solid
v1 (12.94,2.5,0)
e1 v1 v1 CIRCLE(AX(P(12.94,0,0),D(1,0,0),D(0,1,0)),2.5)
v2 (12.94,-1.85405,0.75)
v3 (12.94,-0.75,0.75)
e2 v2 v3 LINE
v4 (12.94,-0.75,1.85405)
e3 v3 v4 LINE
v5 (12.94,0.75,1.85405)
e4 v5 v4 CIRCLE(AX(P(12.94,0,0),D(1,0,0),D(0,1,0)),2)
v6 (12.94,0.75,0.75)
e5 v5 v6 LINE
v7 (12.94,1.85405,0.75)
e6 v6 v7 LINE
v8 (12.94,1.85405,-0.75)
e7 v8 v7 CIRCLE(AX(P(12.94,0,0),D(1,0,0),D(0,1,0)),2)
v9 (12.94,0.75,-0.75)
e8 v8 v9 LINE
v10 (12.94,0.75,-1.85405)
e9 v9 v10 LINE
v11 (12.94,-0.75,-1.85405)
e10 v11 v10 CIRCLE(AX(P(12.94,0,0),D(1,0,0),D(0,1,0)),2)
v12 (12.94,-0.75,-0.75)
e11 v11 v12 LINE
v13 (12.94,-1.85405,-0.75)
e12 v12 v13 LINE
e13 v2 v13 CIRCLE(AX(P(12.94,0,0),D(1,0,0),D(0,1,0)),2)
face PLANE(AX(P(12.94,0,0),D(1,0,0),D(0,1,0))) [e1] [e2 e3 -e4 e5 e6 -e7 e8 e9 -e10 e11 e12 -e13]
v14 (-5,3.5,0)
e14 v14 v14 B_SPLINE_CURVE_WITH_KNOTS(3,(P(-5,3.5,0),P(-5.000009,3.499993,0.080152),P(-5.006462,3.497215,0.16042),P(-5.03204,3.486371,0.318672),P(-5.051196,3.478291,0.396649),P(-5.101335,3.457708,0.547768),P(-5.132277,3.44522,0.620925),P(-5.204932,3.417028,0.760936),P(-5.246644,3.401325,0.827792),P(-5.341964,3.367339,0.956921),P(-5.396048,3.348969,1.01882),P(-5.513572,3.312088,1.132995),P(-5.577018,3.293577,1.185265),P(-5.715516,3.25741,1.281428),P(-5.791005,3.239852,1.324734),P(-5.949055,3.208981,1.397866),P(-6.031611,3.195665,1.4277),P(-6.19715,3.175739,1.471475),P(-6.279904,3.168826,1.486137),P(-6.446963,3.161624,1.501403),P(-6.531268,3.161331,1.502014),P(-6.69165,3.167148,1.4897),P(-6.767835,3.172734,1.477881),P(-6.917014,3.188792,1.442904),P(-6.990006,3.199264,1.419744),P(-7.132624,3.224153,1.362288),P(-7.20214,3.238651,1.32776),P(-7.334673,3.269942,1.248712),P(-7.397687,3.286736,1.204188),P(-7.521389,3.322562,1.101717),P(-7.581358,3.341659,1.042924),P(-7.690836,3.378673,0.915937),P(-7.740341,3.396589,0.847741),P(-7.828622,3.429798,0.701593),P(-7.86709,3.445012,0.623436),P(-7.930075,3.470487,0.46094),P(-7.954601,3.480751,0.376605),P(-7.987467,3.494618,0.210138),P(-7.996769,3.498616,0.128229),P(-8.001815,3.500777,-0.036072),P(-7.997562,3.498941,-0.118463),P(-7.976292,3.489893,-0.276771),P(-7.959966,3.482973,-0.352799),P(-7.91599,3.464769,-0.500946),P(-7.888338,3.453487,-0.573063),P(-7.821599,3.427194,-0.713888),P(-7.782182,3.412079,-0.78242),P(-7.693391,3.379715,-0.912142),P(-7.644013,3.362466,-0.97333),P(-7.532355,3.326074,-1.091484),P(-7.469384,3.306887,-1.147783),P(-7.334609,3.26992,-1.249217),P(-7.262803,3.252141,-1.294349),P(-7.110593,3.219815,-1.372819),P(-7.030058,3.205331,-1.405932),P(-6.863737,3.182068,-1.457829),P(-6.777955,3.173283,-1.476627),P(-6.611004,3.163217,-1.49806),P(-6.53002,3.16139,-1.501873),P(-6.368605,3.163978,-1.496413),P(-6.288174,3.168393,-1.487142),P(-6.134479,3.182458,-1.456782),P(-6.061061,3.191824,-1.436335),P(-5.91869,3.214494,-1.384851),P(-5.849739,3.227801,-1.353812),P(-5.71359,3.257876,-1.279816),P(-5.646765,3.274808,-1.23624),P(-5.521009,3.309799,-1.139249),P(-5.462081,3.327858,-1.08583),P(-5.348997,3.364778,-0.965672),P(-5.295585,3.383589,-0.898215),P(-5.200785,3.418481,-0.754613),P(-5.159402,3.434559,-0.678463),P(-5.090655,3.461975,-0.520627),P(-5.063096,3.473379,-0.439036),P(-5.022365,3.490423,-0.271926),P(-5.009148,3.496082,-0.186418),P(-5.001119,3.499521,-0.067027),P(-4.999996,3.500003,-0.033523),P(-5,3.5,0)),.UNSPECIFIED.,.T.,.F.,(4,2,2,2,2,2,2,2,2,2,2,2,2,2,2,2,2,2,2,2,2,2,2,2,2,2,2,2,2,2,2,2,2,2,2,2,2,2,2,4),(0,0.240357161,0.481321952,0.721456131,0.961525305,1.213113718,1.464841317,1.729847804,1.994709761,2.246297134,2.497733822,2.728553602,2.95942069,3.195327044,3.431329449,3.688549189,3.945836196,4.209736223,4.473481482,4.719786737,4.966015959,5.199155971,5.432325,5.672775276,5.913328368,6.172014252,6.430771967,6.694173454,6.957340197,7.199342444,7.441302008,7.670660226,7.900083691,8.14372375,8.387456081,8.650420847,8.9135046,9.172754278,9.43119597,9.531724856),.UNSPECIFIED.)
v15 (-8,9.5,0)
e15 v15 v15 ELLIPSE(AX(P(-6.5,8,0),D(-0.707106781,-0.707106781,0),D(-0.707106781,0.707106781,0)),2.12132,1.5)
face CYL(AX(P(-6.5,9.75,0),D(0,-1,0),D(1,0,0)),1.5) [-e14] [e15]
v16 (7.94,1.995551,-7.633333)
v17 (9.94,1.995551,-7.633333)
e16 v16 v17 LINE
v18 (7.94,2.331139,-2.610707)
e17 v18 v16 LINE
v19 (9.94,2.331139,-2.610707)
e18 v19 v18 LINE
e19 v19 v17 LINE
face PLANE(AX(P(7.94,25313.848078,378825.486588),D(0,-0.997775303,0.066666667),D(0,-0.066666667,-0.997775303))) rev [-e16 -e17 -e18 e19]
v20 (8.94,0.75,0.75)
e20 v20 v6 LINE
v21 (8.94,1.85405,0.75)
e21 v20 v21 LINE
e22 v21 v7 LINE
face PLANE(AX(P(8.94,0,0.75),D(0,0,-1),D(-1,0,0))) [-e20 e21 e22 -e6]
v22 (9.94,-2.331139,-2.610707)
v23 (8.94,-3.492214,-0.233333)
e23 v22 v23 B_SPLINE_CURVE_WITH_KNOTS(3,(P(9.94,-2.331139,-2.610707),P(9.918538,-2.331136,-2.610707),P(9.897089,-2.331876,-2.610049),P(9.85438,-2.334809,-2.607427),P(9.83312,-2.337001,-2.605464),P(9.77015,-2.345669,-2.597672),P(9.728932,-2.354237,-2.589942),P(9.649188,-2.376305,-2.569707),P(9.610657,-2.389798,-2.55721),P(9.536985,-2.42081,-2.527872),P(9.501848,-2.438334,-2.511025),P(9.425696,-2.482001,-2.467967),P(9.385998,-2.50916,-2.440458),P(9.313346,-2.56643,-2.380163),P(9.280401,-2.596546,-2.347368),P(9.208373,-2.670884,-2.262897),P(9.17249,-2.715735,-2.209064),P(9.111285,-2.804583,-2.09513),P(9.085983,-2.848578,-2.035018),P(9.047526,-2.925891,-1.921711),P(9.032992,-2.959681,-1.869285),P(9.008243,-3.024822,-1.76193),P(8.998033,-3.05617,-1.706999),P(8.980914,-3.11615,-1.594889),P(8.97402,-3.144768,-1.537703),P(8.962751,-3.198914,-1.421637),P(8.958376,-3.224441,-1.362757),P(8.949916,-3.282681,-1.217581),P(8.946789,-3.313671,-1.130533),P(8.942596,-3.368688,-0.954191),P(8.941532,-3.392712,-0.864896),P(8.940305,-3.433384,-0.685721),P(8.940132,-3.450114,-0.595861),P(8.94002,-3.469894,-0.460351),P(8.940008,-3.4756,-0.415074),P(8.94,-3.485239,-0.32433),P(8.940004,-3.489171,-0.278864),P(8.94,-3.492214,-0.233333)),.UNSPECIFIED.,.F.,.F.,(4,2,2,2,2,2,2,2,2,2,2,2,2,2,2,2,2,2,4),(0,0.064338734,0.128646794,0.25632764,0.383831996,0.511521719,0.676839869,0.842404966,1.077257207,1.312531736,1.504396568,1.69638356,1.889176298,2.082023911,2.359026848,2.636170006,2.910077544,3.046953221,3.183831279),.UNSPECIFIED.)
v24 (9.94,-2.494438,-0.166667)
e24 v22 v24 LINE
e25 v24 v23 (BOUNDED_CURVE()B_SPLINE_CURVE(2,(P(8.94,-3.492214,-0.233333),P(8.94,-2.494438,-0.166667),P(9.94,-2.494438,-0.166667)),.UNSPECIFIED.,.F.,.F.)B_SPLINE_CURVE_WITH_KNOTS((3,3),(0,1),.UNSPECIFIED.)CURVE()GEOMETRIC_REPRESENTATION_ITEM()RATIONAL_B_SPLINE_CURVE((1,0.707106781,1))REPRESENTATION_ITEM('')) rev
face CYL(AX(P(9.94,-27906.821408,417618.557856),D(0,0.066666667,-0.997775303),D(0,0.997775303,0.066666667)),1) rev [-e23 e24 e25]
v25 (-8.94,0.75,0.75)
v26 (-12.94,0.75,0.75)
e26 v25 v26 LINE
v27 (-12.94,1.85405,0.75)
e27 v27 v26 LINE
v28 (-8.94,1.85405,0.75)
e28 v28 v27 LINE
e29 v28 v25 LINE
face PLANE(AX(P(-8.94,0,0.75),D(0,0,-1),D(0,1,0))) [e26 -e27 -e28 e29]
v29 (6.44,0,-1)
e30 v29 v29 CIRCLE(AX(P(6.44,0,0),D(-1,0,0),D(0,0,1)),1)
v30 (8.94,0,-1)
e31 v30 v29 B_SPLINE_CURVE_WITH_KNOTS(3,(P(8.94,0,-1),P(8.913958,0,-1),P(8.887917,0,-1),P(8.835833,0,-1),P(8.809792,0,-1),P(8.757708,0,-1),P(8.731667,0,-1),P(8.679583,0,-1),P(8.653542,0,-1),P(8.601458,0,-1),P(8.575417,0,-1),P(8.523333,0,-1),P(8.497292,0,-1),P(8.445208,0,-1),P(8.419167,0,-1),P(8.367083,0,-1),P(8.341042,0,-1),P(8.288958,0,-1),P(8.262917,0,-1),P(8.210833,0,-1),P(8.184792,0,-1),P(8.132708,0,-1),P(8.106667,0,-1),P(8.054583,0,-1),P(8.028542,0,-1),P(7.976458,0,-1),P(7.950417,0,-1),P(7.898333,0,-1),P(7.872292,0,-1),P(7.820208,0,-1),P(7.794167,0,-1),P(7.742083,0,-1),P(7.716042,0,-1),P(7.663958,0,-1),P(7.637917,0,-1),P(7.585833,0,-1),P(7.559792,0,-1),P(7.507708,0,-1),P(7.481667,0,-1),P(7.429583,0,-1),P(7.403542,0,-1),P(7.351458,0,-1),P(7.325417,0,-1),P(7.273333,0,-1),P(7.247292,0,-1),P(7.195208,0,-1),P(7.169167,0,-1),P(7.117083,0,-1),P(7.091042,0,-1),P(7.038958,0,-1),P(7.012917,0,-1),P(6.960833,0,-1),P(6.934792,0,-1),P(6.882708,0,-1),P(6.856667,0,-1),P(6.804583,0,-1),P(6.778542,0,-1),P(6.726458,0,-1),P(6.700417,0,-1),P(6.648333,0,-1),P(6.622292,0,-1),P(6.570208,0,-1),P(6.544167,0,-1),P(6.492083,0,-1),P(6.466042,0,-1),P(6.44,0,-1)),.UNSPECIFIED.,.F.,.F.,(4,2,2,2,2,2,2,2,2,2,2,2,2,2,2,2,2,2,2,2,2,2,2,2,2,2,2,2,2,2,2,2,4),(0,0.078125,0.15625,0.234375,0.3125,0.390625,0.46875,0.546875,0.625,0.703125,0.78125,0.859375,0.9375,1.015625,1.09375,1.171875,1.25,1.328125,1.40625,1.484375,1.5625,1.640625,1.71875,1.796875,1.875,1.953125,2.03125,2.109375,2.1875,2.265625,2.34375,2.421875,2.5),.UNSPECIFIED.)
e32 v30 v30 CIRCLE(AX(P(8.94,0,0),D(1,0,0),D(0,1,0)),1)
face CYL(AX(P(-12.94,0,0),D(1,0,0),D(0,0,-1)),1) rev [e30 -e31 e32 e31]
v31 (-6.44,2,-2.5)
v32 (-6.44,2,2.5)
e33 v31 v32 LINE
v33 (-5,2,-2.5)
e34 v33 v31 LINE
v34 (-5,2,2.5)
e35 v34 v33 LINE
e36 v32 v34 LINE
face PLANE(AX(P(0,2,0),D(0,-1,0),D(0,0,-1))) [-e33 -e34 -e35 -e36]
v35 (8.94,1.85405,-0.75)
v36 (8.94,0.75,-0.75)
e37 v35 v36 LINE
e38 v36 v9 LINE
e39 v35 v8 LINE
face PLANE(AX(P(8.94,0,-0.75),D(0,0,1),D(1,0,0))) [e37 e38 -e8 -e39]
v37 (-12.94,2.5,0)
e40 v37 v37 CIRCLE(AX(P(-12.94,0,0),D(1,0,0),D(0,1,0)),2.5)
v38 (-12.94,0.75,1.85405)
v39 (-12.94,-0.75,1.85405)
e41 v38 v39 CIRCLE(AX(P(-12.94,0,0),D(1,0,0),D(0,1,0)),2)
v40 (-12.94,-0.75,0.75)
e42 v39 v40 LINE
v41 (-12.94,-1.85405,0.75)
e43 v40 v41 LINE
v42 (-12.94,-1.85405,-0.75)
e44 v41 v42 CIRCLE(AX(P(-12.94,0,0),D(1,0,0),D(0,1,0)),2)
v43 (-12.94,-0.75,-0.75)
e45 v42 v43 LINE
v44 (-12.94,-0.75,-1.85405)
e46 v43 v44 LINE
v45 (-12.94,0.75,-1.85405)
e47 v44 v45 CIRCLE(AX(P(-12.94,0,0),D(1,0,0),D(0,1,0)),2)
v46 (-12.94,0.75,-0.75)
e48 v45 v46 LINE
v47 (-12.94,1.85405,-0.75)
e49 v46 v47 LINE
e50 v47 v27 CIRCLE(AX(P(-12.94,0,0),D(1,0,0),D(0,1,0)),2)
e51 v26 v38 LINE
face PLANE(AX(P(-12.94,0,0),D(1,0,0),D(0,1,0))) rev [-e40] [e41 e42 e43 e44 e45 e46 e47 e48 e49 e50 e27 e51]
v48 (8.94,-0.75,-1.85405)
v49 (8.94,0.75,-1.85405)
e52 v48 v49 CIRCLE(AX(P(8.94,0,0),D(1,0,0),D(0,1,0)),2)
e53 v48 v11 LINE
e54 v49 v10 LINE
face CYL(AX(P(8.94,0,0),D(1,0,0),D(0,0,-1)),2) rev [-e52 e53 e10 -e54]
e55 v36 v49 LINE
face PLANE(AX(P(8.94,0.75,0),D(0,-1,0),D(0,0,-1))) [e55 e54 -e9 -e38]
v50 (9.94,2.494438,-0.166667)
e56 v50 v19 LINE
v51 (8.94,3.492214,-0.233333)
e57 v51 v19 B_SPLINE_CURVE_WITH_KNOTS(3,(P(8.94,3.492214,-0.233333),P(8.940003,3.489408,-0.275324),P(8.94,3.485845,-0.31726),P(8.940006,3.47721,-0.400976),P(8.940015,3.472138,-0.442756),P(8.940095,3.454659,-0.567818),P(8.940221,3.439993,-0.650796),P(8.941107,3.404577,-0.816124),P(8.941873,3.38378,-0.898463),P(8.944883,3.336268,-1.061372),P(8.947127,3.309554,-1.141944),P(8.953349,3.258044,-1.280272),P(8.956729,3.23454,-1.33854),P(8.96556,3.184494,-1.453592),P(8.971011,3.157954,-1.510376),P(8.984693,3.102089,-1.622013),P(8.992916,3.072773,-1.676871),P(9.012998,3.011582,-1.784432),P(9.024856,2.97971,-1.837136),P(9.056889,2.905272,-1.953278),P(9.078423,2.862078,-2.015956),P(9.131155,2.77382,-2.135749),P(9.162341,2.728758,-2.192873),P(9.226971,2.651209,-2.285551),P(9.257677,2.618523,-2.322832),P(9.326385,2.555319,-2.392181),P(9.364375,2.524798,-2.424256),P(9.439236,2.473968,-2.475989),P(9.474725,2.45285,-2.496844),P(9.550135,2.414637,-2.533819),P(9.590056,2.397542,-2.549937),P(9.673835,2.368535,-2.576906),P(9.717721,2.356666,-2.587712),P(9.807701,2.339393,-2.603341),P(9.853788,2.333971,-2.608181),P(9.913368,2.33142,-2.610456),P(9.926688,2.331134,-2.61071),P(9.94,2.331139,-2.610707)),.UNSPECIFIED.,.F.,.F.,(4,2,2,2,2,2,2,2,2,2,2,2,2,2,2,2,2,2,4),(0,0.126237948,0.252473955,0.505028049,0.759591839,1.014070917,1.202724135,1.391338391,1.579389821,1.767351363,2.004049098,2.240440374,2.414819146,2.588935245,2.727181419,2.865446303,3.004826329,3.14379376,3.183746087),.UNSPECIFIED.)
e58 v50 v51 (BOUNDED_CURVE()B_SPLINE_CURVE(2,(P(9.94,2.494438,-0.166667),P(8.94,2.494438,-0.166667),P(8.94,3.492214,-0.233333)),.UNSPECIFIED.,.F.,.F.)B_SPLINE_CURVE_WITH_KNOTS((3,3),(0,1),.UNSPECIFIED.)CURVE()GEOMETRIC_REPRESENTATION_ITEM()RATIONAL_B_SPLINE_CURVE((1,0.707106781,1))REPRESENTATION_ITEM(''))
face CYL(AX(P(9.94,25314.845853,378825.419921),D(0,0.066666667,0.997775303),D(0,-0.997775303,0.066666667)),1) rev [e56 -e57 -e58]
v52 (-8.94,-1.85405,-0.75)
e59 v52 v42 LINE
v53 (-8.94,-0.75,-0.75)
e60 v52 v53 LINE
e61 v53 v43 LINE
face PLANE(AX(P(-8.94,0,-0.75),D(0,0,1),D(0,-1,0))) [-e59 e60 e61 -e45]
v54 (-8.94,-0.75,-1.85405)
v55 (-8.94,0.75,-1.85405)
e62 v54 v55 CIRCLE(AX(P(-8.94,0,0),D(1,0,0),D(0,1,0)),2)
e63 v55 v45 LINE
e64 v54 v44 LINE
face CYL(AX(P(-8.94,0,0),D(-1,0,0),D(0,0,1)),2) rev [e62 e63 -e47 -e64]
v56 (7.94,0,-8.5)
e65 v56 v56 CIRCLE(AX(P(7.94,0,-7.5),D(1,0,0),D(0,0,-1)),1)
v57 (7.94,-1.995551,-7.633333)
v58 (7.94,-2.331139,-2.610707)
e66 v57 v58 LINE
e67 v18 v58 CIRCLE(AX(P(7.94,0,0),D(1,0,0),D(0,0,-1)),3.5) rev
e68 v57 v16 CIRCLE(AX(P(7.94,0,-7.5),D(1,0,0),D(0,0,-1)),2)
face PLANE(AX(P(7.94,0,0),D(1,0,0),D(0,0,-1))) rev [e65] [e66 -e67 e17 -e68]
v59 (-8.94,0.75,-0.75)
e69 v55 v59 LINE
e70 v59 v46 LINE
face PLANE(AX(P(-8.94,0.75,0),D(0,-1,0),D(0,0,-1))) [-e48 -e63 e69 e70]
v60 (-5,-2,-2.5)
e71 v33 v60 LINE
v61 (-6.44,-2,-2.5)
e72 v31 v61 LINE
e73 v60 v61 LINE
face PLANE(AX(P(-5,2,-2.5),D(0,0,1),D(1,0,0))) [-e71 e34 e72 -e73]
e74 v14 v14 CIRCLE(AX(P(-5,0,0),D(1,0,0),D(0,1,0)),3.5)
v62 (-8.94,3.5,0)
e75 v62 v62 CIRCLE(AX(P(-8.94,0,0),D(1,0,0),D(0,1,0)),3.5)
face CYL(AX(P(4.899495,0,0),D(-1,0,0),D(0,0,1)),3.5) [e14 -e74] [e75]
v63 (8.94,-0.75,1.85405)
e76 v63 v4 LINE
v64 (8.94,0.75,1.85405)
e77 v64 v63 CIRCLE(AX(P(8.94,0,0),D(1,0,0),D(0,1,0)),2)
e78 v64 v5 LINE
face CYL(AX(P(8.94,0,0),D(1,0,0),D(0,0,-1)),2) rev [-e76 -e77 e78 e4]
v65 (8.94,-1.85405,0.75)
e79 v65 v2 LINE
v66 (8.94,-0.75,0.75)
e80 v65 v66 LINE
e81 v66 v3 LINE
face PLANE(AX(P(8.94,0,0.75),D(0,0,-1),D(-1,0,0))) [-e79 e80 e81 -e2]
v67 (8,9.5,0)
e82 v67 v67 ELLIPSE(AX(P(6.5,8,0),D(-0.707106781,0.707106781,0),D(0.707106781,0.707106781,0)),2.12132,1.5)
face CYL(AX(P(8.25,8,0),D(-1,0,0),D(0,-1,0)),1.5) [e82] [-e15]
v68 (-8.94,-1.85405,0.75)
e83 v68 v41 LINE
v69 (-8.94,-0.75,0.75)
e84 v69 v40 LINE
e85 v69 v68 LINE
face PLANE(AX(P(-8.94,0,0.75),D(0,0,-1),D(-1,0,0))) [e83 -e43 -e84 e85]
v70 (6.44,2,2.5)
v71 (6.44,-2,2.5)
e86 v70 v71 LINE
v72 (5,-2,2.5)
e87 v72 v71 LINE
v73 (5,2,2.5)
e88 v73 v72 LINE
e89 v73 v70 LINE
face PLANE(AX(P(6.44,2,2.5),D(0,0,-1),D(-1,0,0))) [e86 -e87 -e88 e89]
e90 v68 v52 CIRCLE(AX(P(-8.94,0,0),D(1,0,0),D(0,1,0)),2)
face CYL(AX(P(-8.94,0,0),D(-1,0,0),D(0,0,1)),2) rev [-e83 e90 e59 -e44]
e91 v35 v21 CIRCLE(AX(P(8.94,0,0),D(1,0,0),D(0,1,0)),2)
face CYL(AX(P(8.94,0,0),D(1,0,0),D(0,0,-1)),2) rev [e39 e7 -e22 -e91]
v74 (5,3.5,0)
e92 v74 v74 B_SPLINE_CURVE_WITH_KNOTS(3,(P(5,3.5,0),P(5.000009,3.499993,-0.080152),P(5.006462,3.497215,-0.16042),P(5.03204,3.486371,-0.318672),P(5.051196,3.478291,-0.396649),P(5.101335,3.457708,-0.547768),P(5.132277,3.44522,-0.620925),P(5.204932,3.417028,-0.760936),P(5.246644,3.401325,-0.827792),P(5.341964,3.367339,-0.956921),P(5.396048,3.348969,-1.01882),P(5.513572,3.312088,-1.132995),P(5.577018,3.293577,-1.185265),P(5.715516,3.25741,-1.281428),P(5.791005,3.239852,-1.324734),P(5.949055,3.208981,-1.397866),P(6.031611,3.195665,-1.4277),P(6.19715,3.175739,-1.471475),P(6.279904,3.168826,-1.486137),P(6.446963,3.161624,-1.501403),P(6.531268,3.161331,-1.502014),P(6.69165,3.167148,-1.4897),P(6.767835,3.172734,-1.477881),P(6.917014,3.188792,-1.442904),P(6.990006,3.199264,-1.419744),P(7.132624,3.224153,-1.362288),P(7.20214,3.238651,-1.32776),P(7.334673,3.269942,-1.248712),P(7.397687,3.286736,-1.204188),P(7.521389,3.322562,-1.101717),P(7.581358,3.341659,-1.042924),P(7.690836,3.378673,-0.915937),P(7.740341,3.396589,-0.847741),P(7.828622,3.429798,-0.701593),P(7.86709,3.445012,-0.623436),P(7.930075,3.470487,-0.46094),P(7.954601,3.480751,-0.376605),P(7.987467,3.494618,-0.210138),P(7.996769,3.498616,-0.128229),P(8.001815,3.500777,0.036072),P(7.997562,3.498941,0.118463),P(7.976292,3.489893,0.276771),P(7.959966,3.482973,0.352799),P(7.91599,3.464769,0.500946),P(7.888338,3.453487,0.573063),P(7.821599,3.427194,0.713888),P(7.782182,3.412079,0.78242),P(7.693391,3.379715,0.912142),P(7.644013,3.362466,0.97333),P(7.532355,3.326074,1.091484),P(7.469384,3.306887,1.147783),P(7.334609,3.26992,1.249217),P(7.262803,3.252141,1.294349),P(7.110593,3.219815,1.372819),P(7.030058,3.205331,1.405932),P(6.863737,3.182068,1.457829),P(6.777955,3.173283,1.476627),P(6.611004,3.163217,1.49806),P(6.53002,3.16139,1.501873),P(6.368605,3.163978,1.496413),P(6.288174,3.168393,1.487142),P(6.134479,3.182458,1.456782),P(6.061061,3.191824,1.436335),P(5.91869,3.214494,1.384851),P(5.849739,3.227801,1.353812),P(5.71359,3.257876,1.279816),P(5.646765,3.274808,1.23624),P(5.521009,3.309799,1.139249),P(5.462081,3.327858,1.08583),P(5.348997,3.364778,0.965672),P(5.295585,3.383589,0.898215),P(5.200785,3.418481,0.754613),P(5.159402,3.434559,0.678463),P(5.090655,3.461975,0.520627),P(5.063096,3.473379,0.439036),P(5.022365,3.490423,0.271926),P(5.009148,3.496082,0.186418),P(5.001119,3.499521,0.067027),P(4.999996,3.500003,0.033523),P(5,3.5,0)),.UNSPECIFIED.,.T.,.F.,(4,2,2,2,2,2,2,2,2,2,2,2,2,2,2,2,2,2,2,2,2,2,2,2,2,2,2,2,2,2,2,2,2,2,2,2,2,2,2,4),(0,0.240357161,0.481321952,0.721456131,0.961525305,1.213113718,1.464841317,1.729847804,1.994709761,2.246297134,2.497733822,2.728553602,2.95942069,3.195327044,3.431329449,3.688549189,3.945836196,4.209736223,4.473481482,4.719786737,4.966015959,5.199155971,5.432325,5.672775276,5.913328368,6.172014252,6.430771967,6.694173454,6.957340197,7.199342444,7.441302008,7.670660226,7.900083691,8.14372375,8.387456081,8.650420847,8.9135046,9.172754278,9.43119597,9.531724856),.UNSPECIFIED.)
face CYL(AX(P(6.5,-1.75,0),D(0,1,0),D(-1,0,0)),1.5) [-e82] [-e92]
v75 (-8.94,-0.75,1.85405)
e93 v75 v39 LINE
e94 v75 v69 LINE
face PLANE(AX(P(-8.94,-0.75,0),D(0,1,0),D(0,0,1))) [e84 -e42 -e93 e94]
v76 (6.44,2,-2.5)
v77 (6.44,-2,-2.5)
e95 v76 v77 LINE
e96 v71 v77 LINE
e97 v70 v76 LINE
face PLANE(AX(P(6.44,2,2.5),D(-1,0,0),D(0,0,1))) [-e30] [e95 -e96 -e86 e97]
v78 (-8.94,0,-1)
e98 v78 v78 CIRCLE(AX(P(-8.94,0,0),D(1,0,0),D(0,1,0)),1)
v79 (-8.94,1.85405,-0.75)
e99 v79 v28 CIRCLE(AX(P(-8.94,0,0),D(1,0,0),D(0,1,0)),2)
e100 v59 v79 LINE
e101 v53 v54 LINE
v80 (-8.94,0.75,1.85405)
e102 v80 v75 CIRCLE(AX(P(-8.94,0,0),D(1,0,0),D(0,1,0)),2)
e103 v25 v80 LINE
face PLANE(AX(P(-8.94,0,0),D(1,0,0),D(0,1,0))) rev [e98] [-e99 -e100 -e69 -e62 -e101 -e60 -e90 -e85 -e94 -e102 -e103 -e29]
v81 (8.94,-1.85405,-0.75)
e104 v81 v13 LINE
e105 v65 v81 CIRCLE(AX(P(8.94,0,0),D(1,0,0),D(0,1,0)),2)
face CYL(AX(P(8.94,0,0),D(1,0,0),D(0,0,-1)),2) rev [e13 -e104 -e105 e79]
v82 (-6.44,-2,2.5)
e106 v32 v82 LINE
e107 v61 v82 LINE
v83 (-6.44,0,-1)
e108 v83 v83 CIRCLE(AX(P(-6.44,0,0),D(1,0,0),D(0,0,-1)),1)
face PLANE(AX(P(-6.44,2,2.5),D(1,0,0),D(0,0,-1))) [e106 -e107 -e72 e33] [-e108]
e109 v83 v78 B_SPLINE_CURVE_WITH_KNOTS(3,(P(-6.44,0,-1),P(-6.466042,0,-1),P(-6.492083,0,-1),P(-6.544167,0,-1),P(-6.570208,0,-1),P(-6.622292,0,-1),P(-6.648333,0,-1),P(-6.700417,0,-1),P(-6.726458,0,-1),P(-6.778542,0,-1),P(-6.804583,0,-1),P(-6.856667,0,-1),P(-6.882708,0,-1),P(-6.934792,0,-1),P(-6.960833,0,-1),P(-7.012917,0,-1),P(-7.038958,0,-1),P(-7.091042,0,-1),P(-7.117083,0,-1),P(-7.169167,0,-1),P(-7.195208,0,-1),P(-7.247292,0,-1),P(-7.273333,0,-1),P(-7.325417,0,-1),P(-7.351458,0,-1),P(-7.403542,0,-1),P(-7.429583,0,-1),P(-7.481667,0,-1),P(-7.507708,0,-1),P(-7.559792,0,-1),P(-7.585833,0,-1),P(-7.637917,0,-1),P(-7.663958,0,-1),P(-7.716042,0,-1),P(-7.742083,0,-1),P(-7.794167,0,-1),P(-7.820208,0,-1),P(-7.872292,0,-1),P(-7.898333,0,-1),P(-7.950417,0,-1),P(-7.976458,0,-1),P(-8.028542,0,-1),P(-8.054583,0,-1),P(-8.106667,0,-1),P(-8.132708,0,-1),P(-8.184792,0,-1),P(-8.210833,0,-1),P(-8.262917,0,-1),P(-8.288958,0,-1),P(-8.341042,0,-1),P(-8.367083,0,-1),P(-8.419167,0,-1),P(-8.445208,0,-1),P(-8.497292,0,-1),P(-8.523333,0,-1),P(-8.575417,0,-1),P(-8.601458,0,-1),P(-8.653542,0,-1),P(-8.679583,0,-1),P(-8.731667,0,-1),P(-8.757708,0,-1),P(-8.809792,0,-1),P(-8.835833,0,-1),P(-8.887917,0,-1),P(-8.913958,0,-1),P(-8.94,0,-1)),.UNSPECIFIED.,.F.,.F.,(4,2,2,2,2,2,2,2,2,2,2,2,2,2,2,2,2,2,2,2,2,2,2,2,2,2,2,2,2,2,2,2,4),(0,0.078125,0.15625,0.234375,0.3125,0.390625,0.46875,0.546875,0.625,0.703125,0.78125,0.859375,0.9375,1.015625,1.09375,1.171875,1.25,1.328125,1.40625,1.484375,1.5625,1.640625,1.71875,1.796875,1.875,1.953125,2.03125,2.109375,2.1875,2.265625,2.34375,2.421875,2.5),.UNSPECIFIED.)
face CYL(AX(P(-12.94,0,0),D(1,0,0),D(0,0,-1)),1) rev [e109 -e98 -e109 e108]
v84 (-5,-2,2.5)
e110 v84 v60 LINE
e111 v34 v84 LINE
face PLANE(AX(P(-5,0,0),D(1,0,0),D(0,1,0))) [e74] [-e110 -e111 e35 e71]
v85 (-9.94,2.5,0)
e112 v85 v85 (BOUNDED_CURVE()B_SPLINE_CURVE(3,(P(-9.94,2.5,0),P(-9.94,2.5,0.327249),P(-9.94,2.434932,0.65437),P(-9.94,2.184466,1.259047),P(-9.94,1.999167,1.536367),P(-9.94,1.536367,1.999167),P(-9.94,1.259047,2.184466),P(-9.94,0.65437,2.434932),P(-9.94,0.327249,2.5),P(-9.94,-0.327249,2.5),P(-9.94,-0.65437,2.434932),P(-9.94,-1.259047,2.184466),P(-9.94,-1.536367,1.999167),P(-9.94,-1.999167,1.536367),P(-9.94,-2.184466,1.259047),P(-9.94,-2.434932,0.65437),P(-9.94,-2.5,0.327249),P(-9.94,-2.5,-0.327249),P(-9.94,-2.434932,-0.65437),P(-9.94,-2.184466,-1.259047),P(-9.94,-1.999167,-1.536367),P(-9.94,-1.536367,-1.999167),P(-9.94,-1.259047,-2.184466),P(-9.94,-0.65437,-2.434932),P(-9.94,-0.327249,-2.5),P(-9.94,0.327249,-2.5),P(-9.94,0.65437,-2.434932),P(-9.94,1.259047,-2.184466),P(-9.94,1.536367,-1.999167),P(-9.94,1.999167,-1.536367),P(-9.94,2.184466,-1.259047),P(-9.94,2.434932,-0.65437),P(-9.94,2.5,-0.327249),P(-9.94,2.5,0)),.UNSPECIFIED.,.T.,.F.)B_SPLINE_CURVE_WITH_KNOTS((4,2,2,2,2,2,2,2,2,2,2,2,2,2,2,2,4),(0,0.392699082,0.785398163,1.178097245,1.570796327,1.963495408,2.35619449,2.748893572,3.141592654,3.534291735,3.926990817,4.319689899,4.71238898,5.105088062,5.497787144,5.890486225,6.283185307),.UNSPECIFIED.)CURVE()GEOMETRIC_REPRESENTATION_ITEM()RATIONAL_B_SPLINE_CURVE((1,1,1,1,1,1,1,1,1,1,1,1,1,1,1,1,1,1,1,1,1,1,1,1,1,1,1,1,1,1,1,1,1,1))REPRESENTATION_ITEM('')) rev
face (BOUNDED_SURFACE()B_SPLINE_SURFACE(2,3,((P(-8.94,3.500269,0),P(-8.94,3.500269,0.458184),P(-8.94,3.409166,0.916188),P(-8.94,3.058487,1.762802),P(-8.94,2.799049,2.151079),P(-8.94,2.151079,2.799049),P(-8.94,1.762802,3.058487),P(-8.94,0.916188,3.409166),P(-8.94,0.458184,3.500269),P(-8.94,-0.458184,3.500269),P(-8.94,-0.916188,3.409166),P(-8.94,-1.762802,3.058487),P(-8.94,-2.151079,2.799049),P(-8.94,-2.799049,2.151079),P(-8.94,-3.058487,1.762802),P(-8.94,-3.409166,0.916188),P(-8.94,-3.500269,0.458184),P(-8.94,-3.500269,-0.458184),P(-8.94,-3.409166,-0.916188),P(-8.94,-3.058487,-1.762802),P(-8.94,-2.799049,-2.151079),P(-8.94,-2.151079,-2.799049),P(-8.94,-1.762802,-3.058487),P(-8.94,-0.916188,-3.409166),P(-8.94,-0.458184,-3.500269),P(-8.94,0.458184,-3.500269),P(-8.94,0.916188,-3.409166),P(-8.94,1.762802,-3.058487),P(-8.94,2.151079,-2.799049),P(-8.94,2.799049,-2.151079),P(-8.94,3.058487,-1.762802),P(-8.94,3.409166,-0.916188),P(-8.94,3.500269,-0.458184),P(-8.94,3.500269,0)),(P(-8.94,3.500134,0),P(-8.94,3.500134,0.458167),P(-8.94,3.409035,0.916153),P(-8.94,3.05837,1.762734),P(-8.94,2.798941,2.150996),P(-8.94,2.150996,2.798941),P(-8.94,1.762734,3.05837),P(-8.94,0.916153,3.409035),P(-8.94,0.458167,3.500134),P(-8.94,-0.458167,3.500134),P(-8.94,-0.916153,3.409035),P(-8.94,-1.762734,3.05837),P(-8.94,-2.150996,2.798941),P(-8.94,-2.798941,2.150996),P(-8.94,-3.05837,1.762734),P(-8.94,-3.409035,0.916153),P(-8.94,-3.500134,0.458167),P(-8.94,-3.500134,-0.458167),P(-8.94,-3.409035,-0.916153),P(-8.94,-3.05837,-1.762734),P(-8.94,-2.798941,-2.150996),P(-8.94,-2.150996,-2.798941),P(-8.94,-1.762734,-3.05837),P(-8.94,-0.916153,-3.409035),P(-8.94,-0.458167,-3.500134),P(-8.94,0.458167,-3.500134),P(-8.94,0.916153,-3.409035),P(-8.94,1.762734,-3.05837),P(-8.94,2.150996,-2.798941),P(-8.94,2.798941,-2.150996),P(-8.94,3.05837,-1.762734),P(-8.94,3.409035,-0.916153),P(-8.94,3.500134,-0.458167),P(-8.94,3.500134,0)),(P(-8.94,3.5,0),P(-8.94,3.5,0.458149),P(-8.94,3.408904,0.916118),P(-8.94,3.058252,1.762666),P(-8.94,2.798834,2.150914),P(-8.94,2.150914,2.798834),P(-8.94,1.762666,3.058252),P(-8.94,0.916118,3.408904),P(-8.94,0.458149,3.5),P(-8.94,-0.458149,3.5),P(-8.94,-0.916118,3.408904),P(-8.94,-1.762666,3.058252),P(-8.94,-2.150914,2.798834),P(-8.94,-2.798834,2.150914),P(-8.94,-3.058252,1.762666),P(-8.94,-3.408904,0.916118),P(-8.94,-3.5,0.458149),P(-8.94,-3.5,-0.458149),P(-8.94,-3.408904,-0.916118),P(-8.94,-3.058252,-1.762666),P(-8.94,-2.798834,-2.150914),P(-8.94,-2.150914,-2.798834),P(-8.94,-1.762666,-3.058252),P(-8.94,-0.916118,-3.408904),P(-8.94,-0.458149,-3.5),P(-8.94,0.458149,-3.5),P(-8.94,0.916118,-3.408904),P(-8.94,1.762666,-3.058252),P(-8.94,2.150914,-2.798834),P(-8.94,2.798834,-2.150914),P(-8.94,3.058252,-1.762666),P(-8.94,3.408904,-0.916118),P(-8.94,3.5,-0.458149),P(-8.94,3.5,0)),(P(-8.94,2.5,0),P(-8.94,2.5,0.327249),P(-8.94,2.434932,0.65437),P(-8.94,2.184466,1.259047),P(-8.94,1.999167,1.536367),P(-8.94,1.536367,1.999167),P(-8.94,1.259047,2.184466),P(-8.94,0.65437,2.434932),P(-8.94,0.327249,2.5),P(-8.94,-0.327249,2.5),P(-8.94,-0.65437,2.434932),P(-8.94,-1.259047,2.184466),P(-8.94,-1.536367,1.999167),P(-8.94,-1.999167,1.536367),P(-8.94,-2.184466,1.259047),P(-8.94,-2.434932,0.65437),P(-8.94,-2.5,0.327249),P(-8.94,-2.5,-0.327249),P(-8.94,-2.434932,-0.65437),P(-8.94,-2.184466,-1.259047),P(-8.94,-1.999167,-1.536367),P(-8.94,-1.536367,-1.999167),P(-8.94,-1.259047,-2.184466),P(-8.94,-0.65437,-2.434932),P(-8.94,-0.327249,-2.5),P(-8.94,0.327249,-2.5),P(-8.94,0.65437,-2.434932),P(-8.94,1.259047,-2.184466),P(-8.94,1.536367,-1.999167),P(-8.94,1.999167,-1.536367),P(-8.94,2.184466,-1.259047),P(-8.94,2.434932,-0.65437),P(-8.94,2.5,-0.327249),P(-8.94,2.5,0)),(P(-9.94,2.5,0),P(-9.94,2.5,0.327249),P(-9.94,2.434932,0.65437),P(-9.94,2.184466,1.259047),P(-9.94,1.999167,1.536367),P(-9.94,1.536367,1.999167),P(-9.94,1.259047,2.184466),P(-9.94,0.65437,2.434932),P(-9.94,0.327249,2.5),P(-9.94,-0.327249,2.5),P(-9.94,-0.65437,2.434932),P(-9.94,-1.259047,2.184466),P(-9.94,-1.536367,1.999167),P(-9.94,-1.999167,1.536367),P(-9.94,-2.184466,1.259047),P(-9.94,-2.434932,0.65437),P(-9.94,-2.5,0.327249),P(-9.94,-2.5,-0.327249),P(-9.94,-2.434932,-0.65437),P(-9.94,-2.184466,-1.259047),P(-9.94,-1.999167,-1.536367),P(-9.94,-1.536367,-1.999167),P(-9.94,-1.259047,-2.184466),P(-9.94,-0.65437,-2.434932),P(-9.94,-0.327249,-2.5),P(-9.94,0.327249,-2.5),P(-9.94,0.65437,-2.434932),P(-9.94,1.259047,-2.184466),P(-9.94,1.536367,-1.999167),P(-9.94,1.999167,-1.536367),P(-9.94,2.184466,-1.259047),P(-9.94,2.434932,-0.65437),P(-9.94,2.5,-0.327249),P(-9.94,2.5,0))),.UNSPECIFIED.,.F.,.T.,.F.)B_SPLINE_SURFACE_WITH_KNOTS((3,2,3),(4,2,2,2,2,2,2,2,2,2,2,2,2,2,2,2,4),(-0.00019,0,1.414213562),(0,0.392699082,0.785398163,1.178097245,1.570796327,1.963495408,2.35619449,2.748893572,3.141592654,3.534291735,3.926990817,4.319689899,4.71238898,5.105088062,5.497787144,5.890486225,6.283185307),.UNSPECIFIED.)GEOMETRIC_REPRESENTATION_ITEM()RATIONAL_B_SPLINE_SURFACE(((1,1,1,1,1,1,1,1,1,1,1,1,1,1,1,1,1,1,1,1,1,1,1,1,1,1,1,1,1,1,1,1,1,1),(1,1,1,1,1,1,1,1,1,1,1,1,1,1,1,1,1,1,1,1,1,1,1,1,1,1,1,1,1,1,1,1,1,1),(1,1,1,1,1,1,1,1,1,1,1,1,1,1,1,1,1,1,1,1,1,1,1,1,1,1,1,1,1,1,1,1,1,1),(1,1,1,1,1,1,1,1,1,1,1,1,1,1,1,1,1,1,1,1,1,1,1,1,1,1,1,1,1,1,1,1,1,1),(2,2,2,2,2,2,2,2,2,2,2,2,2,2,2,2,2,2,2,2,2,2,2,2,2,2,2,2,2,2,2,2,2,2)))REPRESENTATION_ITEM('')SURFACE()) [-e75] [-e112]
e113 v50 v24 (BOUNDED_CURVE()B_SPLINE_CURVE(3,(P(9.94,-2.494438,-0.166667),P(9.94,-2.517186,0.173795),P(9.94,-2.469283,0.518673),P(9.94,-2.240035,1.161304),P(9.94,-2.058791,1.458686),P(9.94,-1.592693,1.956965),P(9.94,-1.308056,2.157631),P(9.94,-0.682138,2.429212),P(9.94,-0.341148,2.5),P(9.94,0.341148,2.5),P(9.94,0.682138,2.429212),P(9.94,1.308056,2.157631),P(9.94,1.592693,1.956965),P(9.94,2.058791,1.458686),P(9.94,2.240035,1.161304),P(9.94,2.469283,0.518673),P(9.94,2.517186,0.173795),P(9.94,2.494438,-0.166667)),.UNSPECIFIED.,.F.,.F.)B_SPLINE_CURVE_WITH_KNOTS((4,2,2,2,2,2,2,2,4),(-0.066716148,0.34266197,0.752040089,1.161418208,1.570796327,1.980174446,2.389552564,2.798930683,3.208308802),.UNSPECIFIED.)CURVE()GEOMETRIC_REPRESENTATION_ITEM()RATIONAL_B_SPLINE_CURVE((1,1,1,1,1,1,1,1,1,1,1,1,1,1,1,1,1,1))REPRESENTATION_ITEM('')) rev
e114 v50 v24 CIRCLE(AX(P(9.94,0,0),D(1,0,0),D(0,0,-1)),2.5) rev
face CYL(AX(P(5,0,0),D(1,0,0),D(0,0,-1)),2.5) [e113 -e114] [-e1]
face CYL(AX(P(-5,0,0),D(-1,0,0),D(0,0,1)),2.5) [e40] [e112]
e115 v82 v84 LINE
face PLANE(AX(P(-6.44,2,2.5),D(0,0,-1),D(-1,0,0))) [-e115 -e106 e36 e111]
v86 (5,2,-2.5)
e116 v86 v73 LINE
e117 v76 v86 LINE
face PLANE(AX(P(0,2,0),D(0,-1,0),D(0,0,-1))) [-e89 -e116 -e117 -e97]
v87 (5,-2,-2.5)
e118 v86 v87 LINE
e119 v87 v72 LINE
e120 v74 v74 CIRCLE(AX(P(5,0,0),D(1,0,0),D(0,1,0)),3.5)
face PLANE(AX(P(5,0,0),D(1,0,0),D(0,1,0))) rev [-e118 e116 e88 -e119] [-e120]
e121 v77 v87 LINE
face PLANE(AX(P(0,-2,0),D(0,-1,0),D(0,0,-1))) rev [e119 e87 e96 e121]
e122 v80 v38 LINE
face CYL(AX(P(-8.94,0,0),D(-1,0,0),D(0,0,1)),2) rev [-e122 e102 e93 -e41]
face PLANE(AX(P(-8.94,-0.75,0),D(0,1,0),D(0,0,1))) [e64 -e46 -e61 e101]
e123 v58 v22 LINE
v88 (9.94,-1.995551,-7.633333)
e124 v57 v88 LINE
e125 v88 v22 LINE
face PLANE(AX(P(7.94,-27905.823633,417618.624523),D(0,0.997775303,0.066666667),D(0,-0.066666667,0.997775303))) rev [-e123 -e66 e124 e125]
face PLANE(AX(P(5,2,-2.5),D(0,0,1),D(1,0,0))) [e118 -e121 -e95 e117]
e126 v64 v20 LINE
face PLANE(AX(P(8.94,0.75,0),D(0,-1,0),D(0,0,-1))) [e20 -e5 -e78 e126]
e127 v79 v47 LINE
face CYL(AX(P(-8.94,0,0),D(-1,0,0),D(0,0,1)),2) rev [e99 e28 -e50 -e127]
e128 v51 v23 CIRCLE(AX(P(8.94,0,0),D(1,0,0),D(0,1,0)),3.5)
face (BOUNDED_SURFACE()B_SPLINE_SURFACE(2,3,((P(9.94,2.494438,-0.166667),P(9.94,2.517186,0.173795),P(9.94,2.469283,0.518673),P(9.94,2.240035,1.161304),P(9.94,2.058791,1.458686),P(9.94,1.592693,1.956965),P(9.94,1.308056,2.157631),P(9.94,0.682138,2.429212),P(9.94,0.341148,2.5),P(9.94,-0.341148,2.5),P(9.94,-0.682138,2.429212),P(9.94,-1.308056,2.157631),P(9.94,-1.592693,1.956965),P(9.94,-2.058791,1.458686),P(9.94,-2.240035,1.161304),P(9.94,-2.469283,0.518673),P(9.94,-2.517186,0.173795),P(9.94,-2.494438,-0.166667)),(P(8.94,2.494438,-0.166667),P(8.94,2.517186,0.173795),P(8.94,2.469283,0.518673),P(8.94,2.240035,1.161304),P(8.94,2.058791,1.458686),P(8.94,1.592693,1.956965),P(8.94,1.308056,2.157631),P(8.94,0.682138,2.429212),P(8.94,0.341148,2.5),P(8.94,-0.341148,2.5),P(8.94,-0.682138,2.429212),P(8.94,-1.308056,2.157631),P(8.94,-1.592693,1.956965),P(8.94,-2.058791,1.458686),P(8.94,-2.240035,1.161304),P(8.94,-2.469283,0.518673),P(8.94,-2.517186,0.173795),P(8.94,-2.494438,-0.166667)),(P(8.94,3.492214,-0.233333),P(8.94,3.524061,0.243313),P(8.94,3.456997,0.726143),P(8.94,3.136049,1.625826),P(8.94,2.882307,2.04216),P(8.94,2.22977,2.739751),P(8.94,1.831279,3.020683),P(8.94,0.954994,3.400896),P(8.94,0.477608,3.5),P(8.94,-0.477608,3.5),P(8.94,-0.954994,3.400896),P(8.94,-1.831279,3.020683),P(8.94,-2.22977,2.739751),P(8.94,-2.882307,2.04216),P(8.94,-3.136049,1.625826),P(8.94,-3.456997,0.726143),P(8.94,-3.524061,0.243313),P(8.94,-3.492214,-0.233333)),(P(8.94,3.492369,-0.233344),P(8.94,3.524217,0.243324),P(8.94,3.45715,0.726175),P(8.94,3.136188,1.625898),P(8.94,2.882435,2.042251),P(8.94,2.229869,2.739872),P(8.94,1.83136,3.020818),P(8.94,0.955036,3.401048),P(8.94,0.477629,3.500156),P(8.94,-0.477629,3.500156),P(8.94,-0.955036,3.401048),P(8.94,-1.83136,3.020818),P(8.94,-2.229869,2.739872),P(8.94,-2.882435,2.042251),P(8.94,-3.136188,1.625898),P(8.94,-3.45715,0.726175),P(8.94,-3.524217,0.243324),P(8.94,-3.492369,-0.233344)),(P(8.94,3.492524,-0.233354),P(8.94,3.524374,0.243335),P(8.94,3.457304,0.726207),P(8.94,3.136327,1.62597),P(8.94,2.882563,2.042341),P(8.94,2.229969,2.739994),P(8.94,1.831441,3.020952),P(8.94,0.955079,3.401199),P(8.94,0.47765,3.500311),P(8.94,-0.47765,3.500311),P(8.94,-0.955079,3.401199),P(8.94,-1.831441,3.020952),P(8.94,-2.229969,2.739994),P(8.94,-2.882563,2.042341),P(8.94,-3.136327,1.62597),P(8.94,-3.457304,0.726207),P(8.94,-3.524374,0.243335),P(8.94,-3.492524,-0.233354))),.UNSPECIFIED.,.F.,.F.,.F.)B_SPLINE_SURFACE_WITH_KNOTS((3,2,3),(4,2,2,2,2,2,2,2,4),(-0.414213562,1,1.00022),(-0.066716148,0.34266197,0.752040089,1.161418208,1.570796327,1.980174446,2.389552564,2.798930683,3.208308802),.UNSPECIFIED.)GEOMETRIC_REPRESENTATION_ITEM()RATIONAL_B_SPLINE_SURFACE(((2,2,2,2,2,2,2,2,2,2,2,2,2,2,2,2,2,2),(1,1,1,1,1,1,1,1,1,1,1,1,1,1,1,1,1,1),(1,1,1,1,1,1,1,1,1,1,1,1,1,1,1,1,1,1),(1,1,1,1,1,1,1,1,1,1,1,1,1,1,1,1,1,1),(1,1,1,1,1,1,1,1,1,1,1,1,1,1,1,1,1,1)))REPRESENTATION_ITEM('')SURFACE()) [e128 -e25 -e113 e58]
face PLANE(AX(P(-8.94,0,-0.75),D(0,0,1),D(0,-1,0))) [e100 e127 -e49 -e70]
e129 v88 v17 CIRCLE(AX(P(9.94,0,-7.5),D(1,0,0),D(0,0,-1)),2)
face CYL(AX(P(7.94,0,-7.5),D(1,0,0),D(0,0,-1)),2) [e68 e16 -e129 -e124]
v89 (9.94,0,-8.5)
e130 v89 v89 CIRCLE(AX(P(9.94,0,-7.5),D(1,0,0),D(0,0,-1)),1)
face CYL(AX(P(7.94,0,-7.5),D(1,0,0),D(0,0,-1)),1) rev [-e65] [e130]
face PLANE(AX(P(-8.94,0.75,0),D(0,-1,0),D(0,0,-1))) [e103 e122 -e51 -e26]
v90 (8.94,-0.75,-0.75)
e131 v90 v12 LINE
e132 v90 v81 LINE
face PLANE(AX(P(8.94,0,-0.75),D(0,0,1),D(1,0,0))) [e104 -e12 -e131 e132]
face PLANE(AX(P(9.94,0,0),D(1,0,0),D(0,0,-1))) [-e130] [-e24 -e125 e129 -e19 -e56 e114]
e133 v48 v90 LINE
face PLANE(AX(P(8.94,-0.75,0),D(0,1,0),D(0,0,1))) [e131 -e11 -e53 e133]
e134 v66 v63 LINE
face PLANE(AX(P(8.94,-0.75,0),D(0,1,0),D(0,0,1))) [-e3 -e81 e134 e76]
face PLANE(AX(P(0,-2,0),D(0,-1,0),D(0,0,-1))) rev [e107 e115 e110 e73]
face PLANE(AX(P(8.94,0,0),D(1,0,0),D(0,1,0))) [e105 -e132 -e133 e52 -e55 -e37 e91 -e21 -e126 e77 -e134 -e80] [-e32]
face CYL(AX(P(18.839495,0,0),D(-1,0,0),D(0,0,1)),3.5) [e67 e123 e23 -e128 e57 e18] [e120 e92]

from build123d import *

# Parameters (mm, degrees)
SWEEP_1_PROFILE_R        = 1.5
EXTRUDE_1_DEPTH          = 3.44
EXTRUDE_1_DEPTH_BACK     = 4.5
EXTRUDE_1_START          = 9.5
SKETCH_8_R               = 2.5
EXTRUDE_2_DEPTH          = 4.5
EXTRUDE_2_DEPTH_BACK     = 3.44
EXTRUDE_2_START          = -9.5
SKETCH_9_R               = 2.5
EXTRUDE_START            = 9.94
SKETCH_14_R              = 1
EXTRUDE_3_DEPTH          = 2
CUT_EXTRUDE_START        = 12.94
CUT_EXTRUDE_1_DEPTH      = 4
CUT_EXTRUDE_START_2      = -8.94
CUT_EXTRUDE_2_DEPTH      = 4
SKETCH_16_R              = 0.25
CUT_EXTRUDE_3_DEPTH      = 0.25
CUT_EXTRUDE_START_3      = 8.69
SKETCH_17_R              = 0.25
CUT_EXTRUDE_4_DEPTH      = 0.25
EXTRUDE_START_2          = 5
SKETCH_18_R              = 3.5
EXTRUDE_4_DEPTH          = 3.94
EXTRUDE_START_3          = -8.94
SKETCH_20_R              = 3.5
EXTRUDE_5_DEPTH          = 3.94
CUT_EXTRUDE_5_DEPTH      = 2
CUT_EXTRUDE_5_DEPTH_BACK = 2
SKETCH_22_W              = 1.44
SKETCH_22_H              = 5
CUT_EXTRUDE_6_DEPTH      = 19.653246417
CUT_EXTRUDE_6_DEPTH_BACK = 19.653246417
SKETCH_25_R              = 1
FILLET_1_R               = 1


with BuildPart() as part:
    # 扫描1: sweep along a path in 草图1
    with BuildLine(Plane.XY) as sweep_1_path:
        Line((9.5, 0), (6.5, 0))
        Line((6.5, 0), (6.5, 8))
        Line((6.5, 8), (-6.5, 8))
        Line((-6.5, 8), (-6.5, 0))
        Line((-6.5, 0), (-9.5, 0))
    # 扫描1 profile (on start of the path) → 扫描1 (sweep)
    with BuildSketch(Plane(origin=(9.5, 0, 0), x_dir=(0, -1, 0), z_dir=(-1, 0, 0))):
        Circle(SWEEP_1_PROFILE_R)
    sweep(path=sweep_1_path.line, transition=Transition.RIGHT)

    # 草图8 → 凸台-拉伸1 (add, two sides: drawn at the far end of the back side and taken through both)
    with BuildSketch(Plane(origin=(0, 0, 0), x_dir=(0, 0, -1), z_dir=(1, 0, 0)).offset(EXTRUDE_1_START - EXTRUDE_1_DEPTH_BACK)):
        with Locations(Location((0, 0, 0), (0, 0, 90))):
            Circle(SKETCH_8_R)
    extrude(amount=EXTRUDE_1_DEPTH + EXTRUDE_1_DEPTH_BACK)

    # 草图9 → 凸台-拉伸2 (add, two sides: drawn at the far end of the back side and taken through both)
    with BuildSketch(Plane(origin=(0, 0, 0), x_dir=(0, 0, -1), z_dir=(1, 0, 0)).offset(EXTRUDE_2_START - EXTRUDE_2_DEPTH_BACK)):
        with Locations(Location((0, 0, 0), (0, 0, 90))):
            Circle(SKETCH_9_R)
    extrude(amount=EXTRUDE_2_DEPTH + EXTRUDE_2_DEPTH_BACK)

    # 草图14 → 凸台-拉伸3 (add)
    with BuildSketch(Plane(origin=(0, 0, 0), x_dir=(0, 0, -1), z_dir=(1, 0, 0)).offset(EXTRUDE_START)):
        with BuildLine():
            Line((0.166666667, 2.494438258), (7.633333333, 1.995550606))
            ThreePointArc((7.633333333, 1.995550606), (9.5, 0), (7.633333333, -1.995550606))
            Line((7.633333333, -1.995550606), (0.166666667, -2.494438258))
            ThreePointArc((0.166666667, -2.494438258), (-2.5, 0), (0.166666667, 2.494438258))
        make_face()
        with Locations((7.5, 0)):
            Circle(SKETCH_14_R, mode=Mode.SUBTRACT)
    extrude(amount=-EXTRUDE_3_DEPTH)

    # 草图10 → 切除-拉伸1 (cut)
    with BuildSketch(Plane(origin=(0, 0, 0), x_dir=(0, 0, -1), z_dir=(1, 0, 0)).offset(CUT_EXTRUDE_START)):
        with BuildLine():
            Line((0.75, 0.75), (1.854049622, 0.75))
            ThreePointArc((1.854049622, 0.75), (2, 0), (1.854049622, -0.75))
            Line((1.854049622, -0.75), (0.75, -0.75))
            Line((0.75, -0.75), (0.75, -1.854049622))
            ThreePointArc((0.75, -1.854049622), (0, -2), (-0.75, -1.854049622))
            Line((-0.75, -1.854049622), (-0.75, -0.75))
            Line((-0.75, -0.75), (-1.854049622, -0.75))
            ThreePointArc((-1.854049622, -0.75), (-2, 0), (-1.854049622, 0.75))
            Line((-1.854049622, 0.75), (-0.75, 0.75))
            Line((-0.75, 0.75), (-0.75, 1.854049622))
            ThreePointArc((-0.75, 1.854049622), (0, 2), (0.75, 1.854049622))
            Line((0.75, 1.854049622), (0.75, 0.75))
        make_face()
    extrude(amount=-CUT_EXTRUDE_1_DEPTH, mode=Mode.SUBTRACT)

    # 草图11 → 切除-拉伸2 (cut)
    with BuildSketch(Plane(origin=(0, 0, 0), x_dir=(0, 0, -1), z_dir=(1, 0, 0)).offset(CUT_EXTRUDE_START_2)):
        with BuildLine():
            Line((0.75, 0.75), (0.75, 1.854049622))
            ThreePointArc((0.75, 1.854049622), (0, 2), (-0.75, 1.854049622))
            Line((-0.75, 1.854049622), (-0.75, 0.75))
            Line((-0.75, 0.75), (-1.854049622, 0.75))
            ThreePointArc((-1.854049622, 0.75), (-2, 0), (-1.854049622, -0.75))
            Line((-1.854049622, -0.75), (-0.75, -0.75))
            Line((-0.75, -0.75), (-0.75, -1.854049622))
            ThreePointArc((-0.75, -1.854049622), (0, -2), (0.75, -1.854049622))
            Line((0.75, -1.854049622), (0.75, -0.75))
            Line((0.75, -0.75), (1.854049622, -0.75))
            ThreePointArc((1.854049622, -0.75), (2, 0), (1.854049622, 0.75))
            Line((1.854049622, 0.75), (0.75, 0.75))
        make_face()
    extrude(amount=-CUT_EXTRUDE_2_DEPTH, mode=Mode.SUBTRACT)

    # 草图16 → 切除-拉伸3 (cut)
    with BuildSketch(Plane(origin=(0, 0, 0), x_dir=(0, 0, -1), z_dir=(1, 0, 0)).offset(CUT_EXTRUDE_START_2)):
        with Locations(Location((0.75, 0, 0), (0, 0, 90))):
            Circle(SKETCH_16_R)
    extrude(amount=CUT_EXTRUDE_3_DEPTH, mode=Mode.SUBTRACT)

    # 草图17 → 切除-拉伸4 (cut)
    with BuildSketch(Plane(origin=(0, 0, 0), x_dir=(0, 0, -1), z_dir=(1, 0, 0)).offset(CUT_EXTRUDE_START_3)):
        with Locations(Location((0.75, 0, 0), (0, 0, 90))):
            Circle(SKETCH_17_R)
    extrude(amount=CUT_EXTRUDE_4_DEPTH, mode=Mode.SUBTRACT)

    # 草图18 → 凸台-拉伸4 (add)
    with BuildSketch(Plane(origin=(0, 0, 0), x_dir=(0, 0, -1), z_dir=(1, 0, 0)).offset(EXTRUDE_START_2)):
        with Locations(Location((0, 0, 0), (0, 0, 90))):
            Circle(SKETCH_18_R)
    extrude(amount=EXTRUDE_4_DEPTH)

    # 草图20 → 凸台-拉伸5 (add)
    with BuildSketch(Plane(origin=(0, 0, 0), x_dir=(0, 0, -1), z_dir=(1, 0, 0)).offset(EXTRUDE_START_3)):
        with Locations(Location((0, 0, 0), (0, 0, 90))):
            Circle(SKETCH_20_R)
    extrude(amount=EXTRUDE_5_DEPTH)

    # 草图22 → 切除-拉伸5 (cut, two sides: drawn at the far end of the back side and taken through both)
    with BuildSketch(Plane(origin=(0, 0, 0), x_dir=(1, 0, 0), z_dir=(0, 1, 0)).offset(-CUT_EXTRUDE_5_DEPTH_BACK)):
        with Locations((-5.72, 0)):
            Rectangle(SKETCH_22_W, SKETCH_22_H)
        with Locations((5.72, 0)):
            Rectangle(SKETCH_22_W, SKETCH_22_H)
    extrude(amount=CUT_EXTRUDE_5_DEPTH + CUT_EXTRUDE_5_DEPTH_BACK, mode=Mode.SUBTRACT)

    # 草图25 → 切除-拉伸6 (cut, two sides: drawn at the far end of the back side and taken through both)
    with BuildSketch(Plane(origin=(0, 0, 0), x_dir=(0, 0, -1), z_dir=(1, 0, 0)).offset(-CUT_EXTRUDE_6_DEPTH_BACK)):
        Circle(SKETCH_25_R)
    extrude(amount=CUT_EXTRUDE_6_DEPTH + CUT_EXTRUDE_6_DEPTH_BACK, mode=Mode.SUBTRACT)

    # 圆角1
    # the kernel refuses this fillet: 1 mm, written as the material it adds along each edge
    with BuildSketch(Plane(origin=(-8.94, 0, 0), x_dir=(0, 1, 0), z_dir=(0, 0, 1))) as fillet_1_piece_1:
        with BuildLine():
            CenterArc((2.5 + FILLET_1_R, FILLET_1_R), FILLET_1_R, 180, 90)
            Line((2.5, FILLET_1_R), (2.5, 0))
            Line((2.5, 0), (2.5 + FILLET_1_R, 0))
        make_face()
    revolve(axis=Axis((-8.94, 0, 0), (-1, 0, 0)))
    with BuildSketch(Plane(origin=(8.94, 0, 0), x_dir=(0, 1, 0), z_dir=(0, 0, -1))) as fillet_1_piece_2:
        with BuildLine():
            CenterArc((2.5 + FILLET_1_R, FILLET_1_R), FILLET_1_R, 180, 90)
            Line((2.5 + FILLET_1_R, 0), (2.5, 0))
            Line((2.5, 0), (2.5, FILLET_1_R))
        make_face()
    revolve(axis=Axis((8.94, 0, 0), (1, 0, 0)), revolution_arc=183.822553729)
    with BuildSketch(Plane(origin=(8.94, -2.494438258, -0.166666667), x_dir=(1, 0, 0), z_dir=(0, 0.06666666666666658, -0.9977753031397177))) as fillet_1_piece_3_section:
        with BuildLine():
            CenterArc((FILLET_1_R, FILLET_1_R), FILLET_1_R, 180, 90)
            Line((0, FILLET_1_R), (0, 0))
            Line((0, 0), (FILLET_1_R, 0))
        make_face()
    fillet_1_piece_3 = extrude(amount=4.949489743, mode=Mode.PRIVATE)
    fillet_1_piece_3 = fillet_1_piece_3 & Plane(origin=(9.184299624, 0, 0), x_dir=(0, 1, 0), z_dir=(-1, 0, 0)) * Cylinder(3.5, 14, mode=Mode.PRIVATE)
    add(fillet_1_piece_3)
    with BuildSketch(Plane(origin=(8.94, 2.164472275, -5.105145295), x_dir=(0, 0.9977753031397177, -0.0666666666666666), z_dir=(0, 0.06666666666666658, 0.9977753031397177))) as fillet_1_piece_4_section:
        with BuildLine():
            CenterArc((FILLET_1_R, -FILLET_1_R), FILLET_1_R, 90, 90)
            Line((0, -FILLET_1_R), (0, 0))
            Line((0, 0), (FILLET_1_R, 0))
        make_face()
    fillet_1_piece_4 = extrude(amount=4.949489743, mode=Mode.PRIVATE)
    fillet_1_piece_4 = fillet_1_piece_4 & Plane(origin=(9.184299625, 0, 0), x_dir=(0, 1, 0), z_dir=(-1, 0, 0)) * Cylinder(3.5, 14, mode=Mode.PRIVATE)
    add(fillet_1_piece_4)
    with BuildSketch(Plane(origin=(8.94, 0, 0), x_dir=(0, 0.9977753030864385, -0.06666666746407793), z_dir=(0, -0.06666666746407793, -0.9977753030864385))) as fillet_1_piece_5:
        with BuildLine():
            CenterArc((2.5 + FILLET_1_R, FILLET_1_R), FILLET_1_R, 180, 90)
            Line((2.5, FILLET_1_R), (2.5, 0))
            Line((2.5, 0), (2.5 + FILLET_1_R, 0))
        make_face()
    revolve(axis=Axis((8.94, 0, 0), (1, 0, 0)), revolution_arc=3.822553775)


solid = part.part
